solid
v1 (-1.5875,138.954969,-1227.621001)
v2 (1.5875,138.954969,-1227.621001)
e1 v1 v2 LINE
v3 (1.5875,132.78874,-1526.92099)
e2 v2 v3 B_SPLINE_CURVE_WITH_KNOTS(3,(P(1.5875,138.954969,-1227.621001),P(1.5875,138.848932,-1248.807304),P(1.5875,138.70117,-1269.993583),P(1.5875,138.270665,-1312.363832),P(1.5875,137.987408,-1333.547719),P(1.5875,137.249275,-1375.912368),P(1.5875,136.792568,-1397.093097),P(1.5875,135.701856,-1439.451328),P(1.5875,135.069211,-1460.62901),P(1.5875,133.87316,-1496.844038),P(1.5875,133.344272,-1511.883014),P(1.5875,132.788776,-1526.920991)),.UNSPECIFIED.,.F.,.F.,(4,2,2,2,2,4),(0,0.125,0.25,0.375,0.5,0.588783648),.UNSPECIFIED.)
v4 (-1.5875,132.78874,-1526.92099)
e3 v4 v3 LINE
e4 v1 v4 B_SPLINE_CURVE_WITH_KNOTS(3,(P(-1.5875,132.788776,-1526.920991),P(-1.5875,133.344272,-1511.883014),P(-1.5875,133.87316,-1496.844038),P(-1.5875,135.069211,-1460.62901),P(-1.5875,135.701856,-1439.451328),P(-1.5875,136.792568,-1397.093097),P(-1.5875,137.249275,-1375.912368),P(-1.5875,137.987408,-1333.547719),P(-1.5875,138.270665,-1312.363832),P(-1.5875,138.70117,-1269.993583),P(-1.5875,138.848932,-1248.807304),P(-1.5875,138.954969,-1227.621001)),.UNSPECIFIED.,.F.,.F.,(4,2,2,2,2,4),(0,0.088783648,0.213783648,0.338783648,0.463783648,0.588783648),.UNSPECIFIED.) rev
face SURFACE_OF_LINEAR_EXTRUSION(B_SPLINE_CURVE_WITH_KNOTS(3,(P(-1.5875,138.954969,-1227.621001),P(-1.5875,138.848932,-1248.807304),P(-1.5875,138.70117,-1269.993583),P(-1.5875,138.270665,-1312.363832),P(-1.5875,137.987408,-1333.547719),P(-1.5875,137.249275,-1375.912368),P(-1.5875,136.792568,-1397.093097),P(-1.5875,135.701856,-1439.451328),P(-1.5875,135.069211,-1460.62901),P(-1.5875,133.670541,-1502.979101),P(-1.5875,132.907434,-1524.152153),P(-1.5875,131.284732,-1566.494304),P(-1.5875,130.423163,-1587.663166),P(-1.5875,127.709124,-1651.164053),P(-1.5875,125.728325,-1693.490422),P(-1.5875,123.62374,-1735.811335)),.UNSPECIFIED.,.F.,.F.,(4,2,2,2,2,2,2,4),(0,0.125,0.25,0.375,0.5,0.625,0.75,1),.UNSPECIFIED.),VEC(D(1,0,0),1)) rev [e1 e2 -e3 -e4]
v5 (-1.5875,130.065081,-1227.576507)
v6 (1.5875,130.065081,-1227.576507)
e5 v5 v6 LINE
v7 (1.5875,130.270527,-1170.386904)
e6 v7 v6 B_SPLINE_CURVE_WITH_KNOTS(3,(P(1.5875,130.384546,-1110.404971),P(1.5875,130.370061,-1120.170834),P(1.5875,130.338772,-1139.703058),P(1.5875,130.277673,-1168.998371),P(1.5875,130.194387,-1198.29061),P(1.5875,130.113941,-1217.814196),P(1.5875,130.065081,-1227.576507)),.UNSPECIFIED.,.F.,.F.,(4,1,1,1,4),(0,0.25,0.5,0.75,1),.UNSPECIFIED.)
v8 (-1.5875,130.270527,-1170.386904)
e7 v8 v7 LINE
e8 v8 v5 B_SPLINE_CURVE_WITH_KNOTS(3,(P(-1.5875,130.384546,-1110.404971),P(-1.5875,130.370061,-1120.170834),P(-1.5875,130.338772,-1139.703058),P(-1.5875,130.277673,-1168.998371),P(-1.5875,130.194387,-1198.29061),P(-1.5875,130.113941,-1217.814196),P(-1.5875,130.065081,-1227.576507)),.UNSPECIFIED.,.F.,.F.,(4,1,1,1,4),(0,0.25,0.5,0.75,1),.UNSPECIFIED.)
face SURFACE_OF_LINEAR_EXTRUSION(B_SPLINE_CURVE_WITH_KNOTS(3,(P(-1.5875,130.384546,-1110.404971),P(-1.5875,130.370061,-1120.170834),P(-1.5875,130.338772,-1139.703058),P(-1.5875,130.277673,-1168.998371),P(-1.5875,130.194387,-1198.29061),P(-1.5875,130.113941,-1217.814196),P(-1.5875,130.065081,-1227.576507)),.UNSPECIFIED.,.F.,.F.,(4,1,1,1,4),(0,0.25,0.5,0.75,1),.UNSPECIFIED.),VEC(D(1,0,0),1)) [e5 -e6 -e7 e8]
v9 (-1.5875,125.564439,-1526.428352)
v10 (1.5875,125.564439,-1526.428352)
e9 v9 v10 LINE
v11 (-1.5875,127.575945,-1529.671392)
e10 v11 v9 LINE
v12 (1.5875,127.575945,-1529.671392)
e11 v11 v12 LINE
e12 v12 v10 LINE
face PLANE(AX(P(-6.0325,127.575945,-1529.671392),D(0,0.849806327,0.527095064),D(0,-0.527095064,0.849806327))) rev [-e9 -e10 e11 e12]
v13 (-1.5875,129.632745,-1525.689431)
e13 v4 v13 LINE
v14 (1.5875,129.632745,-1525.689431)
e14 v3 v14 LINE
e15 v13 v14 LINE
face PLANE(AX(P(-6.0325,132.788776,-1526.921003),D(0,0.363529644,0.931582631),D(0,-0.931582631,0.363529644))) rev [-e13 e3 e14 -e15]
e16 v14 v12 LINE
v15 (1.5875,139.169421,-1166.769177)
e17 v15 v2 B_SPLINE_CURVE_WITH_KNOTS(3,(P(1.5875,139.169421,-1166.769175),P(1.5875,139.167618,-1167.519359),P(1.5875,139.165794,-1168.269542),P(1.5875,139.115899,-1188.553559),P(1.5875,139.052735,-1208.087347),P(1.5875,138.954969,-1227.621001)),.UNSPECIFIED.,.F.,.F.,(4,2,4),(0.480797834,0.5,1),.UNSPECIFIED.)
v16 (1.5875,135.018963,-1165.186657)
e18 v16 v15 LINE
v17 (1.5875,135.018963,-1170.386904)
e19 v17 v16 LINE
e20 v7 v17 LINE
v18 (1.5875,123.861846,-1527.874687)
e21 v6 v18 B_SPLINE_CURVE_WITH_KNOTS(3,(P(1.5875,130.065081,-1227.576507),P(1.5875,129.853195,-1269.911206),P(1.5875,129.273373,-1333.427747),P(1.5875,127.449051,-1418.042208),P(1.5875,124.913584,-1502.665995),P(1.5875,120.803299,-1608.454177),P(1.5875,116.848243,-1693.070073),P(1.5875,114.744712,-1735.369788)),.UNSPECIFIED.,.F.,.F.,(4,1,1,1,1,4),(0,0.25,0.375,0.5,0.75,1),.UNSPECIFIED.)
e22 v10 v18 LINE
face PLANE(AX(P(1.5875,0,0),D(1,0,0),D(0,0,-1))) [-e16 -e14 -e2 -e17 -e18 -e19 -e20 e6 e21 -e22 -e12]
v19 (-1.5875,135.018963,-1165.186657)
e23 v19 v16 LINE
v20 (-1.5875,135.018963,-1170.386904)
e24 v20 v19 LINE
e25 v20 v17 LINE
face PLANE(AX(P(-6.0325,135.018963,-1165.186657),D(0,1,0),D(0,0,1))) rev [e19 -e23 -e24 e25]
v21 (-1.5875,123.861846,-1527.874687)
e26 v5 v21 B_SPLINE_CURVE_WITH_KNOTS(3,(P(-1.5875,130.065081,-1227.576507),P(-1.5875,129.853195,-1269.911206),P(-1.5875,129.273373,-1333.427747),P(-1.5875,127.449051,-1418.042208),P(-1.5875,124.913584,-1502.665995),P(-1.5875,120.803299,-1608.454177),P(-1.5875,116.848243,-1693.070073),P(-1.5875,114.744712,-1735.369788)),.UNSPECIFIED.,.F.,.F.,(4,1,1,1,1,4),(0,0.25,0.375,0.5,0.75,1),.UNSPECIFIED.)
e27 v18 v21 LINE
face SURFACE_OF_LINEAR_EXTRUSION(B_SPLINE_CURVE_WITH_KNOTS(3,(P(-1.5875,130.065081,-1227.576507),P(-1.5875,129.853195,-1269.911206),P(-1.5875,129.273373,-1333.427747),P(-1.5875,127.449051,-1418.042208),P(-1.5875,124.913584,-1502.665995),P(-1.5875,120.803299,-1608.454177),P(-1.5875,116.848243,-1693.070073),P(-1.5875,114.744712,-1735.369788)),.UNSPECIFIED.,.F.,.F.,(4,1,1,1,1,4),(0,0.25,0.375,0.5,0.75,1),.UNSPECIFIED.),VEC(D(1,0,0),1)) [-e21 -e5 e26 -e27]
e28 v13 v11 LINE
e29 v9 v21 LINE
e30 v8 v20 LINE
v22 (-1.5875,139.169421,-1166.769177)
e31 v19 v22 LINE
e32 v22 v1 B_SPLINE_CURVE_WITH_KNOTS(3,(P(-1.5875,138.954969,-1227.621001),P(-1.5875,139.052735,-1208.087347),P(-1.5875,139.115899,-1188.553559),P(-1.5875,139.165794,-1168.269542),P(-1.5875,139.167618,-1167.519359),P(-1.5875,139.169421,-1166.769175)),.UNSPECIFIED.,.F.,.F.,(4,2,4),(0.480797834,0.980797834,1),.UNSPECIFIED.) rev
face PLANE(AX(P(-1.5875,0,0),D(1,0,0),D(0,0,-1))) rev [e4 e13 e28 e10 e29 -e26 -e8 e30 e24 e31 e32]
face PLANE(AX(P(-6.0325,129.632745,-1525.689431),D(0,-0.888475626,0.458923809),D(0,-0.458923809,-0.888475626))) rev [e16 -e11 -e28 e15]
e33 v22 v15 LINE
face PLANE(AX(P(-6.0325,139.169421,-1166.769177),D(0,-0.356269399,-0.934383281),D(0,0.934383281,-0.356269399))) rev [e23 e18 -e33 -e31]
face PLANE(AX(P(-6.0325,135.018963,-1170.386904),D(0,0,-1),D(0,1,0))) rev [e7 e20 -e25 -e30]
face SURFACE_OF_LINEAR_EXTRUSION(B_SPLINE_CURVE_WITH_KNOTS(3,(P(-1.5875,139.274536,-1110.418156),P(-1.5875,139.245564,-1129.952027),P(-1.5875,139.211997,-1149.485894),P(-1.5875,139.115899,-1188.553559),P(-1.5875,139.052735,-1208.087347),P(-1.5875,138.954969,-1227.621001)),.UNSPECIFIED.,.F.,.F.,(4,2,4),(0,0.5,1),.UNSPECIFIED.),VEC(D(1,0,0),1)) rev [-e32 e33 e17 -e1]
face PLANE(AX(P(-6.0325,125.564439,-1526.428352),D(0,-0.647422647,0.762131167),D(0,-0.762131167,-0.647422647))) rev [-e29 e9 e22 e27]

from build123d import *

# Parameters (mm, degrees)
BOSS_EXTRUDE1_START = -1.5875
BOSS_EXTRUDE1_DEPTH = 3.175
FILLET1_R           = 2.54
CUT_EXTRUDE1_DEPTH  = 2674.191025632
FILLET2_R           = 0.762
FILLET3_R           = 0.762
CUT_EXTRUDE2_DEPTH  = 7.62


with BuildPart() as part:
    # Boss-Extrude1: read off the stored shape, not the designer's step
    # Boss-Extrude1 outline → Boss-Extrude1 (new body)
    with BuildSketch(Plane(origin=(0, 0, 0), x_dir=(0, 0, -1), z_dir=(1, 0, 0)).offset(BOSS_EXTRUDE1_START)):
        with BuildLine():
            add(Edge.make_bspline(
                [(1110.404970926, 130.384545774), (1120.170834465, 130.370061323), (1139.703057908, 130.338772026), (1168.998370974, 130.277673039), (1198.290610395, 130.194386876), (1217.81419633, 130.113940836), (1227.576506903, 130.06508052)],
                knots=[0, 0, 0, 0, 0.25, 0.5, 0.75, 1, 1, 1, 1], degree=3))
            add(Edge.make_bspline(
                [(1227.576506903, 130.06508052), (1269.911205773, 129.853195249), (1333.427746701, 129.273373321), (1418.042208161, 127.449050563), (1502.665994832, 124.913583682), (1608.454176987, 120.803299479), (1693.070073331, 116.848243245), (1735.369787733, 114.744712179)],
                knots=[0, 0, 0, 0, 0.25, 0.375, 0.5, 0.75, 1, 1, 1, 1], degree=3))
            add(Edge.make_bspline(
                [(1735.369787733, 114.744712179), (1815.995940723, 110.735232018), (1936.906650462, 104.096364548), (2098.049485168, 94.18797875), (2198.694736725, 87.314638509), (2279.130413747, 81.114418931), (2339.412950304, 76.034076608), (2399.564054334, 70.28270545), (2479.570468264, 61.127378254), (2559.292087872, 49.650907614), (2626.797554585, 38.235484735), (2656.889518578, 32.788503969), (2667.159793662, 30.877771266), (2669.54, 30.432069924)],
                knots=[0, 0, 0, 0, 0.25, 0.375, 0.5, 0.5625, 0.625, 0.6875, 0.75, 0.875, 0.9375, 0.96241067, 0.969928536, 0.969928536, 0.969928536, 0.969928536], degree=3))
            Line((2669.54, 30.432069924), (2669.54, 39.476142465))
            add(Edge.make_bspline(
                [(1735.811334709, 123.623740069), (1776.138635499, 121.618292624), (1816.460281579, 119.500621806), (1897.093668675, 115.087561885), (1937.405638896, 112.792971084), (2018.018419045, 108.018366523), (2058.319512223, 105.539122976), (2138.903780144, 100.307240032), (2179.18739793, 97.555127955), (2239.586998714, 93.080168687), (2259.716280977, 91.529837622), (2289.900442602, 89.09084343), (2299.960179135, 88.258845039), (2320.076004566, 86.552861654), (2330.132100898, 85.678962223), (2350.239356518, 83.874334847), (2360.290489794, 82.943307484), (2380.385973971, 81.003183297), (2390.430065378, 79.993418555), (2420.547026195, 76.827577532), (2440.60648589, 74.533672955), (2480.675569568, 69.556278523), (2500.68715183, 66.874150811), (2540.654290207, 61.150246295), (2560.611026428, 58.109755646), (2600.475457131, 51.702465574), (2620.382967089, 48.337538888), (2650.028116889, 43.072156367), (2659.78844051, 41.29687683), (2669.54, 39.476142465)],
                knots=[0, 0, 0, 0, 0.125, 0.125, 0.25, 0.25, 0.375, 0.375, 0.5, 0.5, 0.5625, 0.5625, 0.59375, 0.59375, 0.625, 0.625, 0.65625, 0.65625, 0.6875, 0.6875, 0.75, 0.75, 0.8125, 0.8125, 0.875, 0.875, 0.9375, 0.9375, 0.968210768, 0.968210768, 0.968210768, 0.968210768], degree=3))
            add(Edge.make_bspline(
                [(1227.621000751, 138.954969175), (1248.807303679, 138.848931677), (1269.993583155, 138.701170252), (1312.363832348, 138.270664618), (1333.547719008, 137.987407832), (1375.912368189, 137.249274813), (1397.09309738, 136.7925677), (1439.451328259, 135.701855835), (1460.629010312, 135.069210584), (1502.979101161, 133.670541385), (1524.152152736, 132.907434339), (1566.494303759, 131.284732459), (1587.663166024, 130.423163385), (1651.164052809, 127.709123983), (1693.490421561, 125.728325331), (1735.811334709, 123.623740069)],
                knots=[0, 0, 0, 0, 0.125, 0.125, 0.25, 0.25, 0.375, 0.375, 0.5, 0.5, 0.625, 0.625, 0.75, 0.75, 1, 1, 1, 1], degree=3))
            add(Edge.make_bspline(
                [(1110.418156307, 139.274535996), (1129.952027249, 139.245563914), (1149.485893504, 139.211997476), (1188.553558893, 139.115899087), (1208.087346834, 139.052735015), (1227.621000751, 138.954969175)],
                knots=[0, 0, 0, 0, 0.5, 0.5, 1, 1, 1, 1], degree=3))
            add(Edge.make_bspline(
                [(768.740124165, 138.468408213), (782.976796045, 138.460280143), (797.213453801, 138.479500079), (825.686695051, 138.549690296), (839.923258916, 138.600062665), (868.396318956, 138.719026333), (882.632808962, 138.789607972), (911.105746117, 138.939594729), (925.342197007, 139.018479563), (953.81517223, 139.160090703), (968.051699178, 139.222241505), (996.524919377, 139.30995407), (1010.761605517, 139.335014039), (1039.234912871, 139.349647552), (1053.471562869, 139.340493535), (1081.944860968, 139.313691902), (1096.181508981, 139.29565137), (1110.418156307, 139.274535996)],
                knots=[0, 0, 0, 0, 0.125, 0.125, 0.25, 0.25, 0.375, 0.375, 0.5, 0.5, 0.625, 0.625, 0.75, 0.75, 0.875, 0.875, 1, 1, 1, 1], degree=3))
            add(Edge.make_bspline(
                [(630.778432202, 139.251437536), (653.771819614, 139.075315664), (676.765000849, 138.871740519), (711.255349111, 138.647690701), (722.752238945, 138.586174182), (745.746099074, 138.499784896), (757.243084259, 138.474972158), (768.740124165, 138.468408213)],
                knots=[0, 0, 0, 0, 0.5, 0.5, 0.75, 0.75, 1, 1, 1, 1], degree=3))
            add(Edge.make_bspline(
                [(604.514984259, 139.433685568), (609.940743136, 139.400696354), (618.695242427, 139.342071397), (627.449694696, 139.276935028), (630.778432202, 139.251437536)],
                knots=[0, 0, 0, 0, 0.619765686, 1, 1, 1, 1], degree=3))
            ThreePointArc((604.514984259, 139.433685568), (600.549356142, 139.457173081), (596.583720644, 139.479379304))
            add(Edge.make_bspline(
                [(436.133018826, 139.357176562), (449.50393779, 139.390650739), (462.874888934, 139.412366015), (489.61665939, 139.498555977), (502.987497127, 139.559076553), (529.729299233, 139.628029754), (543.100240501, 139.639230481), (569.84212102, 139.601013959), (583.212960696, 139.552035302), (596.583720644, 139.479379304)],
                knots=[0, 0, 0, 0, 0.25, 0.25, 0.5, 0.5, 0.75, 0.75, 1, 1, 1, 1], degree=3))
            add(Edge.make_bspline(
                [(432.263917423, 139.347117104), (433.553617637, 139.350567112), (434.843318039, 139.353947814), (436.133018826, 139.357176562)],
                knots=[0, 0, 0, 0, 1, 1, 1, 1], degree=3))
            add(Edge.make_bspline(
                [(420.316232014, 139.305761868), (422.413235913, 139.315186344), (426.395793967, 139.330351666), (430.378363115, 139.342073082), (432.263917423, 139.347117104)],
                knots=[0, 0, 0, 0, 0.526548575, 1, 1, 1, 1], degree=3))
            add(Edge.make_bspline(
                [(376.410119779, 138.75403864), (383.726317086, 138.935561778), (391.043801196, 139.055611797), (405.679602634, 139.224192856), (412.997895507, 139.272871444), (420.316232014, 139.305761868)],
                knots=[0, 0, 0, 0, 0.5, 0.5, 1, 1, 1, 1], degree=3))
            add(Edge.make_bspline(
                [(336.49221538, 137.002990798), (349.782924989, 137.88646357), (363.094318653, 138.423658969), (376.410119779, 138.75403864)],
                knots=[0, 0, 0, 0, 1, 1, 1, 1], degree=3))
            add(Edge.make_bspline(
                [(322.369488076, 135.928469458), (327.073374868, 136.333386449), (331.781331813, 136.689844531), (336.49221538, 137.002990798)],
                knots=[0, 0, 0, 0, 1, 1, 1, 1], degree=3))
            add(Edge.make_bspline(
                [(269.769949315, 129.47895505), (274.123387467, 130.231879276), (278.485668028, 130.925946417), (287.22796256, 132.196043087), (291.608626646, 132.771988738), (300.381777496, 133.818422146), (304.774579419, 134.288963443), (313.567800313, 135.154375086), (317.967903853, 135.549407043), (322.369488076, 135.928469458)],
                knots=[0, 0, 0, 0, 0.25, 0.25, 0.5, 0.5, 0.75, 0.75, 1, 1, 1, 1], degree=3))
            add(Edge.make_bspline(
                [(135.15718457, 90.054634926), (146.043739673, 94.375230064), (156.99891695, 98.504335222), (173.56622243, 104.322560697), (179.110932848, 106.199810145), (190.24859245, 109.819698901), (195.841545849, 111.562316625), (207.065472514, 114.901345648), (212.697969124, 116.49836249), (224.005973618, 119.540534541), (229.683240596, 120.9862349), (246.767187276, 125.077694043), (258.225188059, 127.482295924), (269.769949315, 129.47895505)],
                knots=[0, 0, 0, 0, 0.25, 0.25, 0.375, 0.375, 0.5, 0.5, 0.625, 0.625, 0.75, 0.75, 1, 1, 1, 1], degree=3))
            add(Edge.make_bspline(
                [(107.049744533, 78.466050261), (116.373258882, 82.438606419), (125.737350123, 86.316143859), (135.15718457, 90.054634926)],
                knots=[0, 0, 0, 0, 1, 1, 1, 1], degree=3))
            add(Edge.make_bspline(
                [(99.06, 75.03568963), (99.223542669, 75.106424562), (100.635498802, 75.716852689), (103.297453866, 76.863328103), (105.798503999, 77.932922637), (107.049744533, 78.466050261)],
                knots=[0.484151133, 0.484151133, 0.484151133, 0.484151133, 0.515864471, 0.757931449, 1, 1, 1, 1], degree=3))
            Line((99.06, 75.03568963), (99.06, 65.345043949))
            add(Edge.make_bspline(
                [(99.06, 65.345043949), (99.380370965, 65.484464523), (100.637671455, 66.031176319), (103.17753745, 67.132002814), (106.681577323, 68.64166857), (109.249580285, 69.740028797), (110.534459652, 70.287489229)],
                knots=[0.254738807, 0.254738807, 0.254738807, 0.254738807, 0.317238807, 0.5, 0.75, 1, 1, 1, 1], degree=3))
            add(Edge.make_bspline(
                [(110.534459652, 70.287489229), (112.850658013, 71.274373329), (117.489277519, 73.236837099), (124.456688526, 76.138068453), (131.438476528, 78.994265342), (136.101204469, 80.864754132), (138.436571012, 81.791601309)],
                knots=[0, 0, 0, 0, 0.25, 0.5, 0.75, 1, 1, 1, 1], degree=3))
            add(Edge.make_bspline(
                [(138.436571012, 81.791601309), (143.826897197, 83.930883835), (154.6522834, 88.11877139), (176.408203186, 96.037596764), (203.906835742, 104.998187521), (237.39469787, 114.027149543), (259.934818065, 118.755998441), (271.284977744, 120.719001348)],
                knots=[0, 0, 0, 0, 0.125, 0.25, 0.5, 0.75, 1, 1, 1, 1], degree=3))
            add(Edge.make_bspline(
                [(271.284977744, 120.719001348), (275.558711595, 121.458140765), (284.124297478, 122.821139095), (297.036360548, 124.518896272), (310.018420247, 125.909880891), (318.766623126, 126.695286194), (323.13209925, 127.071239405)],
                knots=[5e-09, 5e-09, 5e-09, 5e-09, 0.2499992, 0.4999984, 0.7499976, 0.999996801, 0.999996801, 0.999996801, 0.999996801], degree=3))
            add(Edge.make_bspline(
                [(323.13209925, 127.071239405), (324.293050056, 127.171175344), (326.615168427, 127.365043892), (330.101568176, 127.638529754), (333.590184216, 127.895089457), (335.917953069, 128.055198639), (337.081858513, 128.132566852)],
                knots=[1.2024e-05, 1.2024e-05, 1.2024e-05, 1.2024e-05, 0.250009018, 0.500006012, 0.750003006, 1, 1, 1, 1], degree=3))
            add(Edge.make_bspline(
                [(337.081858513, 128.132566852), (340.367862287, 128.350997241), (346.939906877, 128.744909116), (356.821319657, 129.221190111), (366.716250393, 129.595096292), (373.326613137, 129.784797569), (376.630622597, 129.866773678)],
                knots=[0, 0, 0, 0, 0.25, 0.5, 0.75, 1, 1, 1, 1], degree=3))
            add(Edge.make_bspline(
                [(376.630622597, 129.866773678), (380.266394474, 129.956981294), (387.534764147, 130.106779908), (398.462206547, 130.259361028), (409.400972015, 130.358727994), (416.705417778, 130.39944419), (420.356185481, 130.415851648)],
                knots=[0, 0, 0, 0, 0.25, 0.5, 0.75, 1, 1, 1, 1], degree=3))
            add(Edge.make_bspline(
                [(420.356185481, 130.415851648), (421.350045129, 130.420318309), (423.337533562, 130.428603137), (426.320174328, 130.439402209), (429.303468332, 130.448883952), (431.293011648, 130.454488038), (432.287698861, 130.457148912)],
                knots=[0, 0, 0, 0, 0.25, 0.5, 0.75, 1, 1, 1, 1], degree=3))
            add(Edge.make_bspline(
                [(432.287698861, 130.457148912), (432.610032304, 130.45801117), (433.254717136, 130.45972707), (434.221637716, 130.462266911), (435.188505114, 130.464765142), (435.833012253, 130.466397641), (436.155274747, 130.46720442)],
                knots=[9.2e-08, 9.2e-08, 9.2e-08, 9.2e-08, 0.25, 0.5, 0.75, 1, 1, 1, 1], degree=3))
            add(Edge.make_bspline(
                [(436.155274747, 130.46720442), (449.528322363, 130.500683927), (476.275740382, 130.546633815), (516.38896029, 130.728798697), (556.456290895, 130.759667498), (583.176533448, 130.662101975), (596.535396133, 130.589510646)],
                knots=[0, 0, 0, 0, 0.249999973, 0.499999946, 0.749999918, 0.999999891, 0.999999891, 0.999999891, 0.999999891], degree=3))
            ThreePointArc((596.535396133, 130.589510646), (600.498158983, 130.567320504), (604.460914457, 130.543849998))
            add(Edge.make_bspline(
                [(604.460914457, 130.543849998), (606.648150431, 130.530551362), (611.022503017, 130.502867011), (617.584689429, 130.458405465), (624.147187284, 130.411339888), (628.522663802, 130.378455494), (630.7103385, 130.361698324)],
                knots=[-7.09e-07, -7.09e-07, -7.09e-07, -7.09e-07, 0.249999468, 0.499999646, 0.749999823, 1, 1, 1, 1], degree=3))
            add(Edge.make_bspline(
                [(630.7103385, 130.361698324), (642.206126489, 130.273644326), (665.193556095, 130.083785311), (699.699077953, 129.819212193), (734.21504011, 129.634735151), (757.228597075, 129.58497898), (768.735048644, 129.578409662)],
                knots=[0, 0, 0, 0, 0.25, 0.5, 0.75, 1, 1, 1, 1], degree=3))
            add(Edge.make_bspline(
                [(768.735048644, 129.578409662), (797.222409768, 129.56214552), (854.203652026, 129.725124503), (939.635195481, 130.236578518), (1024.992958464, 130.524931921), (1081.937612336, 130.426767717), (1110.404970926, 130.384545774)],
                knots=[0, 0, 0, 0, 0.25, 0.5, 0.75, 1, 1, 1, 1], degree=3))
        make_face()
    extrude(amount=BOSS_EXTRUDE1_DEPTH)

    # Fillet1
    fillet1_edges = [part.edges().sort_by_distance(p)[0] for p in [
        (0, 39.476142465, -2669.54),
        (0, 30.432069924, -2669.54),
        (0, 65.345043949, -99.06),
        (0, 75.03568963, -99.06),
    ]]
    fillet(fillet1_edges, radius=FILLET1_R)

    # Sketch4 → Cut-Extrude1 (cut, through all)
    with BuildSketch(Plane(origin=(1.5875, 0, 0), x_dir=(0, 0, -1), z_dir=(1, 0, 0))):
        Polygon((1827.2125, 118.895836595), (1827.2125, 110.000384115), (1827.2125, 78.791710134), (2135.1875, 78.791710134), (2135.1875, 91.599357392), (2135.1875, 100.508307819), (2135.1875, 129.353842083), (1827.2125, 129.353842083), align=None)
    extrude(amount=-CUT_EXTRUDE1_DEPTH, mode=Mode.SUBTRACT)


with BuildPart() as cut_extrude1_piece_1:
    # of the separate pieces the step leaves, piece 1, a body of its own (cut_extrude1_pieces)
    add(part.part.solids().sort_by_distance((-1.5875, 114.744712179, -1735.369787733))[0])

    # Fillet2
    fillet2_edges = [cut_extrude1_piece_1.edges().sort_by_distance(p)[0] for p in [
        (0, 118.895836595, -1827.2125),
        (0, 110.000384116, -1827.2125),
    ]]
    fillet(fillet2_edges, radius=FILLET2_R)


with BuildPart() as cut_extrude1_piece_2:
    # of the separate pieces the step leaves, piece 2, a body of its own (cut_extrude1_pieces)
    add(part.part.solids().sort_by_distance((-1.5875, 91.599357392, -2135.1875))[0])

    # Fillet3
    fillet3_edges = [cut_extrude1_piece_2.edges().sort_by_distance(p)[0] for p in [
        (0, 100.508307819, -2135.1875),
        (0, 91.599357392, -2135.1875),
    ]]
    fillet(fillet3_edges, radius=FILLET3_R)


with BuildPart() as cut_extrude2_tool:
    # Sketch5 → Cut-Extrude2 (new body)
    with BuildSketch(Plane(origin=(1.5875, 0, 0), x_dir=(0, 0, -1), z_dir=(1, 0, 0))):
        Polygon((1526.921002642, 132.788776067), (1525.689431031, 129.632745348), (1529.671392187, 127.575945218), (1526.428351657, 125.564439067), (1528.398437884, 123.245298517), (1528.398437884, 114.766362614), (2693.334534373, -50.097096662), (2835.169185114, 79.330013005), (1526.921002642, 139.169420645), align=None)
        Polygon((1166.769177473, 139.169420645), (1166.769177473, 145.055582544), (49.799388011, 171.247154198), (49.799388011, 0), (1170.386904229, 114.766362614), (1170.386904229, 130.270526743), (1170.386904229, 135.018963115), (1165.186656638, 135.018963115), align=None)
    extrude(amount=-CUT_EXTRUDE2_DEPTH)


with BuildPart() as cut_extrude1_piece_1_1:
    add(cut_extrude1_piece_1.part)

    # Cut-Extrude2: cut by cut_extrude2_tool
    add(cut_extrude2_tool.part, mode=Mode.SUBTRACT)


with BuildPart() as cut_extrude1_piece_2_1:
    add(cut_extrude1_piece_2.part)

    # Cut-Extrude2: cut by cut_extrude2_tool
    add(cut_extrude2_tool.part, mode=Mode.SUBTRACT)


solid = cut_extrude1_piece_1_1.part
